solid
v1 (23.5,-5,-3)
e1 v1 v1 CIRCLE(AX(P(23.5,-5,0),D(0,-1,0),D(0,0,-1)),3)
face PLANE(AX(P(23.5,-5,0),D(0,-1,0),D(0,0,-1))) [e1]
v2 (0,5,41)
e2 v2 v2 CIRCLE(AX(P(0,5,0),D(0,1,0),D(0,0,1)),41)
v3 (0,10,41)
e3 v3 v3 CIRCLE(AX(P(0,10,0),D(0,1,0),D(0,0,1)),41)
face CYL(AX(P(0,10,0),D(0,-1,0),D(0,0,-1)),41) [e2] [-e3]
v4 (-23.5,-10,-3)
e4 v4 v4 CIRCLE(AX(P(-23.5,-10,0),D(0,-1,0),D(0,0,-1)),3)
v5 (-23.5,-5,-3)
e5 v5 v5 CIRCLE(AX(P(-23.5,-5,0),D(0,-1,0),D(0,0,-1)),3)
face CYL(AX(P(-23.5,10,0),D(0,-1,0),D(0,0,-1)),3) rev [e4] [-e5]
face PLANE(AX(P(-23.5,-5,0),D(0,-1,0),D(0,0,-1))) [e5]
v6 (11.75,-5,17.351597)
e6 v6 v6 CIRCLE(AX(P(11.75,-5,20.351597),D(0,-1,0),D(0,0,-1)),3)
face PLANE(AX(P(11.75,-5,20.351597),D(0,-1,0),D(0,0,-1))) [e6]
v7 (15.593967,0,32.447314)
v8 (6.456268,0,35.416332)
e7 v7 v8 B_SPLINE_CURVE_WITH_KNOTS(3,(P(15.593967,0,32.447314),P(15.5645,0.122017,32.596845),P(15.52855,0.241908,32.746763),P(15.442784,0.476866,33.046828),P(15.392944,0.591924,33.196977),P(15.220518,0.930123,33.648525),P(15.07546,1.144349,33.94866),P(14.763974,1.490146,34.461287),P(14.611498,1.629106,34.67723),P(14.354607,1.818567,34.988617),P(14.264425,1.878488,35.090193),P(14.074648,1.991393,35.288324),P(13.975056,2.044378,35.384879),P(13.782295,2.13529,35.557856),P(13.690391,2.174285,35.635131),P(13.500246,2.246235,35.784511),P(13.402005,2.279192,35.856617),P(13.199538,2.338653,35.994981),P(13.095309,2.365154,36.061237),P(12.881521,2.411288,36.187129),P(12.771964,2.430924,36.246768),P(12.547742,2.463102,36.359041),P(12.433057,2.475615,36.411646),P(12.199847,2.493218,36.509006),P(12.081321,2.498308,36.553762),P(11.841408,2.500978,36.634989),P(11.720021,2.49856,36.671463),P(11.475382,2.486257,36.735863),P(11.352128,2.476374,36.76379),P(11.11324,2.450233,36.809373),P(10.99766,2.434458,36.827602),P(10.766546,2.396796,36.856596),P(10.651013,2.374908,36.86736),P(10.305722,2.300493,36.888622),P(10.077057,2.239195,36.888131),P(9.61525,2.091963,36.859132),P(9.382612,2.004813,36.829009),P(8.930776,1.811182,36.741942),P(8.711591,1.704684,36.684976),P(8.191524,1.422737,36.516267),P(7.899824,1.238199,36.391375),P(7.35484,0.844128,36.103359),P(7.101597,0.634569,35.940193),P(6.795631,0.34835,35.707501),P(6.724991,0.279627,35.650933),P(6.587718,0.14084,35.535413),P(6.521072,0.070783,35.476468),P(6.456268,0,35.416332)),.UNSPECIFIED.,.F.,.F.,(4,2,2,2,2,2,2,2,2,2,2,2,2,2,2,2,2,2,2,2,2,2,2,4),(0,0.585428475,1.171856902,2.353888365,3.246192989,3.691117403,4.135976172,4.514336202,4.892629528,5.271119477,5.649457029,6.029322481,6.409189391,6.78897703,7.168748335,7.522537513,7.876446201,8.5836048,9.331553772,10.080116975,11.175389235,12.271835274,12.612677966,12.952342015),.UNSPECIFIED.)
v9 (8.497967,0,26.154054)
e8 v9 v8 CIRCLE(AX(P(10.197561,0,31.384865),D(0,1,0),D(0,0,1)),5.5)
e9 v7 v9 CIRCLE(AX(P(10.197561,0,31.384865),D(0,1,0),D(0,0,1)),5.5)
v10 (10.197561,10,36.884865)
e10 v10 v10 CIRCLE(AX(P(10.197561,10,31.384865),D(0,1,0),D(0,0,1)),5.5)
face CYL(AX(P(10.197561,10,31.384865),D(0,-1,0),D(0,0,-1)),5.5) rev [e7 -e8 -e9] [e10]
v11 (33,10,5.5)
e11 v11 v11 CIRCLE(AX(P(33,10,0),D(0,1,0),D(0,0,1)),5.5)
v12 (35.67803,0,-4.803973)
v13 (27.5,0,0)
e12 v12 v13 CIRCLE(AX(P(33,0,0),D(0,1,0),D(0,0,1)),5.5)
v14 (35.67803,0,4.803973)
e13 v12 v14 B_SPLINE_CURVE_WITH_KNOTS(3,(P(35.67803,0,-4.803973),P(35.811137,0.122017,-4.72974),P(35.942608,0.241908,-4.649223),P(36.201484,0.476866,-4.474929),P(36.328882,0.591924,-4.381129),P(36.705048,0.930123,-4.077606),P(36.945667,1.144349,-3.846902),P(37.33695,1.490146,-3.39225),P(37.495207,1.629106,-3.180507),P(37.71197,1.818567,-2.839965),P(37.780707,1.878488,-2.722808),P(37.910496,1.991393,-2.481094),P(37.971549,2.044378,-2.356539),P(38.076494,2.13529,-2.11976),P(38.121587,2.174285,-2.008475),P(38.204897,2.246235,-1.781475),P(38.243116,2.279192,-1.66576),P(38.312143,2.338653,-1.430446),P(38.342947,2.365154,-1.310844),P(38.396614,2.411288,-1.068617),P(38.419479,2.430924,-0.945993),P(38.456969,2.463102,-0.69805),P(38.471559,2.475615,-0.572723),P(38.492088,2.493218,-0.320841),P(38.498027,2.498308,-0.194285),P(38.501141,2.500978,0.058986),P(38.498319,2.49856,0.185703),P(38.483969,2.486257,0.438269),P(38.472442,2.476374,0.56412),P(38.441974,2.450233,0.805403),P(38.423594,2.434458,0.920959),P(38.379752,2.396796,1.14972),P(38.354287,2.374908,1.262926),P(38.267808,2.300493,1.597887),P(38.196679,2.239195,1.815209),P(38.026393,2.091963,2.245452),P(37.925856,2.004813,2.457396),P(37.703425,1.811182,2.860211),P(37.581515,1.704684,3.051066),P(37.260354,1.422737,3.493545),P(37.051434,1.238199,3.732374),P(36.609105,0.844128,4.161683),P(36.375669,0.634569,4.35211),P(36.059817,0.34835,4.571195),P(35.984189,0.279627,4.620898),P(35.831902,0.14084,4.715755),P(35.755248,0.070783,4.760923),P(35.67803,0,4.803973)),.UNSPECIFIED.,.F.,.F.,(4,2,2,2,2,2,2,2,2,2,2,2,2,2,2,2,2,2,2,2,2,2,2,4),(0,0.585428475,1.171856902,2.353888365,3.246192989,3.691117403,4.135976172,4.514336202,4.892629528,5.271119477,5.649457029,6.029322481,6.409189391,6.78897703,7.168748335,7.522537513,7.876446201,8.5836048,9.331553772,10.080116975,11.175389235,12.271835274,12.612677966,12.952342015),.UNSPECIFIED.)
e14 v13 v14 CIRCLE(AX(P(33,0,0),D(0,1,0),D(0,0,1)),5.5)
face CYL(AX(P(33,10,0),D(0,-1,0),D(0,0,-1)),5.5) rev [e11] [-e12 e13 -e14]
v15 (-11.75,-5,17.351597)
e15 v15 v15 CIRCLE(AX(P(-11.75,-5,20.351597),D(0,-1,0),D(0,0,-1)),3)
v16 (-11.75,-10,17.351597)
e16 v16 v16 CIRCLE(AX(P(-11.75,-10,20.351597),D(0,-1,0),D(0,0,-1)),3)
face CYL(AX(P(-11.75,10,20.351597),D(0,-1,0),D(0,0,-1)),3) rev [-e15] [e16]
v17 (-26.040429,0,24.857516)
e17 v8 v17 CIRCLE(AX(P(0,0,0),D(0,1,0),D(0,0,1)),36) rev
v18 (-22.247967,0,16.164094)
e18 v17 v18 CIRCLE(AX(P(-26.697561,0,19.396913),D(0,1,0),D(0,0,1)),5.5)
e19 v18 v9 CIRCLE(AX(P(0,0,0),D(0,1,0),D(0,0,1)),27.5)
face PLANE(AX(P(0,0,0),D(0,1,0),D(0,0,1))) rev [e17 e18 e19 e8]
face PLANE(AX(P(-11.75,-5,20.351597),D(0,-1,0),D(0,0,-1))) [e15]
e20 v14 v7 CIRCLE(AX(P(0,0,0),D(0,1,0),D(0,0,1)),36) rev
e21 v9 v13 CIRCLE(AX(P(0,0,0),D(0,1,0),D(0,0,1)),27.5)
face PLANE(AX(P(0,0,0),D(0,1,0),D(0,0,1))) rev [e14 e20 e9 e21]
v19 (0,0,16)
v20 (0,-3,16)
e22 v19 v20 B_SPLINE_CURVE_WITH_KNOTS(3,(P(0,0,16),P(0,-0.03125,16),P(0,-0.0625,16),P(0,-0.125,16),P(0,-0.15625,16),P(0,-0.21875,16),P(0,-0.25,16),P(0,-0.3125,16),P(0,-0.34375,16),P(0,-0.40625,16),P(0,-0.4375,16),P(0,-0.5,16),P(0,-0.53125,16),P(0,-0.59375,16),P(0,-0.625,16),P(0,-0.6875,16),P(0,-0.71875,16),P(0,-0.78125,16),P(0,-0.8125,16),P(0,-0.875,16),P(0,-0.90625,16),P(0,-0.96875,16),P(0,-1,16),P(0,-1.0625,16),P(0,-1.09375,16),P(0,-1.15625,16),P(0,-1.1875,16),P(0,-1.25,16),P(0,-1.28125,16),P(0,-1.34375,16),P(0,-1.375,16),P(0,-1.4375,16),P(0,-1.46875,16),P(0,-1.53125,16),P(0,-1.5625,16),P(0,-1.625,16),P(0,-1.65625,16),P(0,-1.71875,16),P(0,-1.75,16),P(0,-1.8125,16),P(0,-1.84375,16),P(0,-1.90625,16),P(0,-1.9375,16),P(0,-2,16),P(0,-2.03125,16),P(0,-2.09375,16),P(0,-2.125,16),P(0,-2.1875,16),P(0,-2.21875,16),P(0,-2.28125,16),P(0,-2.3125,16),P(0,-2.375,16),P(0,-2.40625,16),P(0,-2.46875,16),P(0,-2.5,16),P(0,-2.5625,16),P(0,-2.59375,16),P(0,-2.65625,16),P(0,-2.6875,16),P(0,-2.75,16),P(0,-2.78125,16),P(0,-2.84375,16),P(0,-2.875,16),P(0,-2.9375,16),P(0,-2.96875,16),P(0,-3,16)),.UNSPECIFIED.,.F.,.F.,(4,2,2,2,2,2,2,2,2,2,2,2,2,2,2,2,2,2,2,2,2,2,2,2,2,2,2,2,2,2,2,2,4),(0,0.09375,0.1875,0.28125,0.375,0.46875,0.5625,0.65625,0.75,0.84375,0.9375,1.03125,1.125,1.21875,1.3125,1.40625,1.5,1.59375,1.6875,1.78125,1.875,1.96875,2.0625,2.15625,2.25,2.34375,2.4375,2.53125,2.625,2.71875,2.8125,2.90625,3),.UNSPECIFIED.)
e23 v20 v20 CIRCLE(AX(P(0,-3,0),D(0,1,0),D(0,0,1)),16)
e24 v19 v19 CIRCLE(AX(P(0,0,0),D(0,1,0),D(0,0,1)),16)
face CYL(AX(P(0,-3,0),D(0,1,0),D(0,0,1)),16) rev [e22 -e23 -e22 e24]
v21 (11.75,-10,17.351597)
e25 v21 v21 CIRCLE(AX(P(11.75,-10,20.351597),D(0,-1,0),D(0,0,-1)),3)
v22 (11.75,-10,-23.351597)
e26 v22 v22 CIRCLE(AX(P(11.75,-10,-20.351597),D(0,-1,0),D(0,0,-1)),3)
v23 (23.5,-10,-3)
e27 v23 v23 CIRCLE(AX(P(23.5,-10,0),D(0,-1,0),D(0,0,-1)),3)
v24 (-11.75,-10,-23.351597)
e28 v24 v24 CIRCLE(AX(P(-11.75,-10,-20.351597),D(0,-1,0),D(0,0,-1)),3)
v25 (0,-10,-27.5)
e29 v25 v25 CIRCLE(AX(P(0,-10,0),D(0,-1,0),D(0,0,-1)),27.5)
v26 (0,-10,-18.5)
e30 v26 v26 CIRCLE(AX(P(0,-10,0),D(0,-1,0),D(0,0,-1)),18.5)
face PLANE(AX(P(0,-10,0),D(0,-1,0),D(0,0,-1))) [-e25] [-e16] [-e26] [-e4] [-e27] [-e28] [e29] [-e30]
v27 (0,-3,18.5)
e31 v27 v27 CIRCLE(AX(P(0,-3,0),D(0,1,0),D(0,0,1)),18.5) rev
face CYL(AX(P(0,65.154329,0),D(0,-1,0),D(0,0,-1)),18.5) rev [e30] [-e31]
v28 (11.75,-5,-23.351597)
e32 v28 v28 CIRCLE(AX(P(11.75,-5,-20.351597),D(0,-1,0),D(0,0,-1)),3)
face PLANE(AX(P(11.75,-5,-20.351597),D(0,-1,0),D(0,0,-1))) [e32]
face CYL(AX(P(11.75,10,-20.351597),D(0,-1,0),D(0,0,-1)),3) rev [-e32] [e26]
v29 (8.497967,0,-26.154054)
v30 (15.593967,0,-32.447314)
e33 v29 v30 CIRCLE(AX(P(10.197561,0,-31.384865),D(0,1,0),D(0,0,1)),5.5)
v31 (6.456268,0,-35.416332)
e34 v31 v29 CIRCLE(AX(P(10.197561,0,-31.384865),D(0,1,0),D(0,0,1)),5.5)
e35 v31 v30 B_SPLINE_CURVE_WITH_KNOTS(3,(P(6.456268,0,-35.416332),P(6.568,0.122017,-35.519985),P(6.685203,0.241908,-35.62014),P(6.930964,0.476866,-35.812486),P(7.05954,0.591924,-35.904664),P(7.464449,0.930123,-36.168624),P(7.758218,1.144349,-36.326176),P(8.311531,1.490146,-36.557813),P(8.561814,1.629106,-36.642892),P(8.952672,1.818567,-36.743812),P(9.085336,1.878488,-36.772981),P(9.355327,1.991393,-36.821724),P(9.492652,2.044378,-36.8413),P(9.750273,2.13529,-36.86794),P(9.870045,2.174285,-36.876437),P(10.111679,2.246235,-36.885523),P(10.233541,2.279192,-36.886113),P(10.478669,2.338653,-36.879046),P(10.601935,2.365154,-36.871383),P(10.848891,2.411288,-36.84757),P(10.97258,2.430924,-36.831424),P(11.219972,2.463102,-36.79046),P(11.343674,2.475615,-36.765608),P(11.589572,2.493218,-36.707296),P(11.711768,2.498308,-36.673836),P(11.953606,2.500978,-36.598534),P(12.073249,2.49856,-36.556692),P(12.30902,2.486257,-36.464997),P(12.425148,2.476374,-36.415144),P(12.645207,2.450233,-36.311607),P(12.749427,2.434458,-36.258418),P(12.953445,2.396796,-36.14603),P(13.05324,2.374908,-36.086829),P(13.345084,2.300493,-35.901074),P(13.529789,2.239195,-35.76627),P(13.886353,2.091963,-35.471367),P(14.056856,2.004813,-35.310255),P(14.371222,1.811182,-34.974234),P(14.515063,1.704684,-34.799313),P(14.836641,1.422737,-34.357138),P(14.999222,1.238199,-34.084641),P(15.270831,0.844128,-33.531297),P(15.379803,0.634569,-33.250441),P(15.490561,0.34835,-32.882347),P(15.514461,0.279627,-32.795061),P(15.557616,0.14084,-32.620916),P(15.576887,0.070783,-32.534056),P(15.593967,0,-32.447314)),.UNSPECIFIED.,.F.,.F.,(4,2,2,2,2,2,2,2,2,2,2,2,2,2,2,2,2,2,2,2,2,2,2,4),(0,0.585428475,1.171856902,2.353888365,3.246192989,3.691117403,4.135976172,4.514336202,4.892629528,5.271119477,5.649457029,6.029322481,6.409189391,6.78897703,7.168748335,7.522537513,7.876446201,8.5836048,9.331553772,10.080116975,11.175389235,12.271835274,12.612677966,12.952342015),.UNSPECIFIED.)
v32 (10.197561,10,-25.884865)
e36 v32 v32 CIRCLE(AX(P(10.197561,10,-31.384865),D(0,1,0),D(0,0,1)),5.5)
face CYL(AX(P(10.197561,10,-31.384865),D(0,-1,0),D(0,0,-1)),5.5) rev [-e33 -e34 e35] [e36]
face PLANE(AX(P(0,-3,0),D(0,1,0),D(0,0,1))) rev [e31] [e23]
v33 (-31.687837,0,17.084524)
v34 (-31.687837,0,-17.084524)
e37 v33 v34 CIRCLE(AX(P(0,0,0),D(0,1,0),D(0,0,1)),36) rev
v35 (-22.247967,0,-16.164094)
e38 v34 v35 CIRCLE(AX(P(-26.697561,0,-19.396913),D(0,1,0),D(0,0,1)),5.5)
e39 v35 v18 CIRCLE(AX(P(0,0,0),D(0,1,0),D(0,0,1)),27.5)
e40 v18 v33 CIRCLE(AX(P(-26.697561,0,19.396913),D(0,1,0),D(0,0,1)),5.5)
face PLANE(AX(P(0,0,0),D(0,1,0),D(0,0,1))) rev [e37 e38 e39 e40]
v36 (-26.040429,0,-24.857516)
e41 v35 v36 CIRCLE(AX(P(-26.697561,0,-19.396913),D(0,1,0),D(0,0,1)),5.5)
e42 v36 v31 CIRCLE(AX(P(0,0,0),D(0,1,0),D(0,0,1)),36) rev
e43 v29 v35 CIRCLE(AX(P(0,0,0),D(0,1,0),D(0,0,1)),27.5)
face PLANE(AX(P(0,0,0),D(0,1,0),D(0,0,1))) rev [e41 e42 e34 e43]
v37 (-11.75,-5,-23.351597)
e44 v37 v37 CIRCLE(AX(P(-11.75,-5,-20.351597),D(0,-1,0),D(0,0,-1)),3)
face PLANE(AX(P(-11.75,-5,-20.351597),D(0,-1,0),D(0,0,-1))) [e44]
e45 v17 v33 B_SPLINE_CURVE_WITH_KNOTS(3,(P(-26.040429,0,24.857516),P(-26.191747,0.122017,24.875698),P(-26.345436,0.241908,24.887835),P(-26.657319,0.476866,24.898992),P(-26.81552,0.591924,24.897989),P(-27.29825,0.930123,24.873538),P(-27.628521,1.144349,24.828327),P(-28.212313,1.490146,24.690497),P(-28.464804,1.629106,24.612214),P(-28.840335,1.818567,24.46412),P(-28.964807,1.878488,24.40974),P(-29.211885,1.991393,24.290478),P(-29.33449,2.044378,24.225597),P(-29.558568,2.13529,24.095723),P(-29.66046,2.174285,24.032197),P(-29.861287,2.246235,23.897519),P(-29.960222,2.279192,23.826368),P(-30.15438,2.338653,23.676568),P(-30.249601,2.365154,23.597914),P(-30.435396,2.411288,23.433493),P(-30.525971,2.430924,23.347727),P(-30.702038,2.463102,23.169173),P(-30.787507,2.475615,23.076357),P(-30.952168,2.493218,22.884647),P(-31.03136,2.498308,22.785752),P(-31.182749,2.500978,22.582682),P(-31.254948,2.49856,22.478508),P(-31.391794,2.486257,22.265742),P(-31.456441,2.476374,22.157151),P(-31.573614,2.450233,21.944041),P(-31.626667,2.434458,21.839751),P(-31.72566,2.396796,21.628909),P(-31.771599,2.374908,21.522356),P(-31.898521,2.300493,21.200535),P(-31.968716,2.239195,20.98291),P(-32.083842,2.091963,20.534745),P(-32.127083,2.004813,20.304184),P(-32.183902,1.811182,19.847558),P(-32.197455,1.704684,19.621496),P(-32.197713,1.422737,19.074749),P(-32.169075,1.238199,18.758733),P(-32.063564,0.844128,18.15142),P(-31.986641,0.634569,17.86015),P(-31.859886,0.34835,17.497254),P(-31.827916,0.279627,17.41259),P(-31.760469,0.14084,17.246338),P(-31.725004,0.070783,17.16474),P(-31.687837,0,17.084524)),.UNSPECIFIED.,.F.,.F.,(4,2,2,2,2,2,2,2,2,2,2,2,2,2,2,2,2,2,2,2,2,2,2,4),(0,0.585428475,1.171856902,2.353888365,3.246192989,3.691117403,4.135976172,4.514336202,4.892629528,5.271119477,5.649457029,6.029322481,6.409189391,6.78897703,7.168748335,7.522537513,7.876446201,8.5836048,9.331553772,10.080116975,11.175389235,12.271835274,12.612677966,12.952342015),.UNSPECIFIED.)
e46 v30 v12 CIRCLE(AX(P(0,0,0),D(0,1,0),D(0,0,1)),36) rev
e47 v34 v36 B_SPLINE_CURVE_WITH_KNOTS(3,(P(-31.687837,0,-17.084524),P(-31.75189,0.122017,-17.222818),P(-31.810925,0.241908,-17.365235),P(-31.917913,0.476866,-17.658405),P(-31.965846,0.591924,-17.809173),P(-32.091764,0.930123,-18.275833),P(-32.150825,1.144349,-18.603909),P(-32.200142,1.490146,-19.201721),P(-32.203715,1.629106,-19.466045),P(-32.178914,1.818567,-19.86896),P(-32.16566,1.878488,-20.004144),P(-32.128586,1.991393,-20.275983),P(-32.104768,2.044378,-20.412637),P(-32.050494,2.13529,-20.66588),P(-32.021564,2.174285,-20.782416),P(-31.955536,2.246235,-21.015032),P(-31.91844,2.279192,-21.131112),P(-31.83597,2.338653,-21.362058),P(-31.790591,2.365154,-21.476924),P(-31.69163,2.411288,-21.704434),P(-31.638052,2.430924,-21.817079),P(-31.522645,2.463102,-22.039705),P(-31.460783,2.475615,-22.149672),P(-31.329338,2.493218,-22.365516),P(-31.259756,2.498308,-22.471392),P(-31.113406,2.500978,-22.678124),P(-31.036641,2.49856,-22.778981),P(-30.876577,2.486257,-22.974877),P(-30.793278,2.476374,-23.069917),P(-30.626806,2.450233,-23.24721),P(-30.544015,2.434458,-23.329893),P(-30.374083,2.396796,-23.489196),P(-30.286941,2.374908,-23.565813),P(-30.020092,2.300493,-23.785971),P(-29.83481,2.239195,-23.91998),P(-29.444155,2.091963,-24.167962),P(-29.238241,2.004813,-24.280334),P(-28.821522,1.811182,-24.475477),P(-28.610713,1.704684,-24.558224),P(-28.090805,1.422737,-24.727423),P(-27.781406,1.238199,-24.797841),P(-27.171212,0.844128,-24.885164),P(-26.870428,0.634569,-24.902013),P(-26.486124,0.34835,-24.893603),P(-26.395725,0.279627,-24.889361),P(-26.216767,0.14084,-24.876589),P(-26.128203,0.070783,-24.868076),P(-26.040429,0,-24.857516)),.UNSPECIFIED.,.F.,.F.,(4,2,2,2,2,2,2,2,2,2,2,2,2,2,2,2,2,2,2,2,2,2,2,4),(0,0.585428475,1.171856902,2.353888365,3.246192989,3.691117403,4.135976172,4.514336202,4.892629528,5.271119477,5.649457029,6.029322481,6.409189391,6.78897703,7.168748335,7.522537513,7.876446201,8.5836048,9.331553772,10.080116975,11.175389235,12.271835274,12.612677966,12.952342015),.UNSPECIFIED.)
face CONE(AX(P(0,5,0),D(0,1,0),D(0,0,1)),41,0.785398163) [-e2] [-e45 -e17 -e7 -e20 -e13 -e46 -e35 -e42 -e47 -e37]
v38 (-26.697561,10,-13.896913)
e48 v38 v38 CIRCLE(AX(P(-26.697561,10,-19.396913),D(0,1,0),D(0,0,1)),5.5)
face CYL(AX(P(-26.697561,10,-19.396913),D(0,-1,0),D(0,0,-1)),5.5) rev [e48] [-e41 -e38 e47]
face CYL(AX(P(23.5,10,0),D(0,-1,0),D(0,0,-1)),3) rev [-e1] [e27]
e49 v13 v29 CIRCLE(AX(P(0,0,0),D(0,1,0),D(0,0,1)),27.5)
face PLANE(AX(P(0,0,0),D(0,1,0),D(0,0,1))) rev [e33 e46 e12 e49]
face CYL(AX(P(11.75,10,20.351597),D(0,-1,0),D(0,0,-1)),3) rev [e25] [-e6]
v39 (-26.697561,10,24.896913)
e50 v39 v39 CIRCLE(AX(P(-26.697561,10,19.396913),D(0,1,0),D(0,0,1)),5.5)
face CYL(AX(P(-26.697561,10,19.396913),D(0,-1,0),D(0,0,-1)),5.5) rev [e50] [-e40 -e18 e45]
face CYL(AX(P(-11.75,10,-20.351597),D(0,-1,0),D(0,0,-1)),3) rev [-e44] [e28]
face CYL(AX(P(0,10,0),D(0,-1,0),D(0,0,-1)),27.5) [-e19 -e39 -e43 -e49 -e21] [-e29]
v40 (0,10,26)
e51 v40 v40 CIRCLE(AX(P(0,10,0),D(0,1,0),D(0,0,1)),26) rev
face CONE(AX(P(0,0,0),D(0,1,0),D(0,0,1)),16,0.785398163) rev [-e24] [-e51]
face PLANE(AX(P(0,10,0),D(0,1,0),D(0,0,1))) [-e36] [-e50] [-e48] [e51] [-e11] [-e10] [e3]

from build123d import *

# Parameters (mm, degrees)
SKETCH1_R                = 41
SKETCH1_R_2              = 5.5
SKETCH1_R_3              = 25
BOSS_EXTRUDE1_DEPTH      = 10
SKETCH2_R                = 25
SKETCH2_R_2              = 22.5
BOSS_EXTRUDE2_DEPTH      = 10
BOSS_EXTRUDE4_DEPTH      = 10
BOSS_EXTRUDE4_DEPTH_BACK = 10
SKETCH4_R                = 27.5
SKETCH4_R_2              = 19.5
SKETCH4_R_3              = 3
BOSS_EXTRUDE5_START      = -10
BOSS_EXTRUDE5_DEPTH      = 10
BOSS_EXTRUDE6_START      = -10
SKETCH6_R                = 3
BOSS_EXTRUDE6_DEPTH      = 5
CHAMFER2_SIZE            = 5
BOSS_EXTRUDE7_START      = -20
SKETCH7_R                = 19.5
SKETCH7_R_2              = 18.5
BOSS_EXTRUDE7_DEPTH      = 20
SKETCH8_R                = 18.5
SKETCH8_R_2              = 16
BOSS_EXTRUDE8_DEPTH      = 13
CHAMFER4_SIZE            = 10


with BuildPart() as part:
    # Sketch1 → Boss-Extrude1 (new body)
    with BuildSketch(Plane(origin=(0, 0, 0), x_dir=(1, 0, 0), z_dir=(0, 1, 0))):
        with Locations(Location((0, 0, 0), (0, 0, 270))):
            Circle(SKETCH1_R)
        with Locations(Location((33, 0, 0), (0, 0, 270))):
            Circle(SKETCH1_R_2, mode=Mode.SUBTRACT)
        with Locations(Location((10.197560814, -31.384865038, 0), (0, 0, 270))):
            Circle(SKETCH1_R_2, mode=Mode.SUBTRACT)
        with Locations(Location((-26.697560814, -19.396913326, 0), (0, 0, 270))):
            Circle(SKETCH1_R_2, mode=Mode.SUBTRACT)
        with Locations(Location((-26.697560814, 19.396913326, 0), (0, 0, 270))):
            Circle(SKETCH1_R_2, mode=Mode.SUBTRACT)
        with Locations(Location((10.197560814, 31.384865038, 0), (0, 0, 270))):
            Circle(SKETCH1_R_2, mode=Mode.SUBTRACT)
        with Locations(Location((0, 0, 0), (0, 0, 270))):
            Circle(SKETCH1_R_3, mode=Mode.SUBTRACT)
    extrude(amount=BOSS_EXTRUDE1_DEPTH)

    # Sketch2 → Boss-Extrude2 (add)
    with BuildSketch(Plane.XZ):
        Circle(SKETCH2_R)
        with Locations(Location((0, 0, 0), (0, 0, 270))):
            Circle(SKETCH2_R_2, mode=Mode.SUBTRACT)
    extrude(amount=-BOSS_EXTRUDE2_DEPTH)

    # Sketch4 → Boss-Extrude4 (add, two sides: drawn at the far end of the back side and taken through both)
    with BuildSketch(Plane.XZ.offset(-BOSS_EXTRUDE4_DEPTH_BACK)):
        with Locations(Location((0, 0, 0), (0, 0, 270))):
            Circle(SKETCH4_R)
        with Locations(Location((0, 0, 0), (0, 0, 270))):
            Circle(SKETCH4_R_2, mode=Mode.SUBTRACT)
        with Locations(Location((23.5, 0, 0), (0, 0, 270))):
            Circle(SKETCH4_R_3, mode=Mode.SUBTRACT)
        with Locations(Location((11.75, -20.351596989, 0), (0, 0, 270))):
            Circle(SKETCH4_R_3, mode=Mode.SUBTRACT)
        with Locations(Location((-11.75, -20.351596989, 0), (0, 0, 270))):
            Circle(SKETCH4_R_3, mode=Mode.SUBTRACT)
        with Locations(Location((-23.5, 0, 0), (0, 0, 270))):
            Circle(SKETCH4_R_3, mode=Mode.SUBTRACT)
        with Locations(Location((-11.75, 20.351596989, 0), (0, 0, 270))):
            Circle(SKETCH4_R_3, mode=Mode.SUBTRACT)
        with Locations(Location((11.75, 20.351596989, 0), (0, 0, 270))):
            Circle(SKETCH4_R_3, mode=Mode.SUBTRACT)
    extrude(amount=BOSS_EXTRUDE4_DEPTH + BOSS_EXTRUDE4_DEPTH_BACK)

    # Sketch5 → Boss-Extrude5 (add)
    with BuildSketch(Plane(origin=(0, 10, 0), x_dir=(1, 0, 0), z_dir=(0, 1, 0)).offset(BOSS_EXTRUDE5_START)):
        with BuildLine():
            ThreePointArc((-13.557162741, 17.956985783), (-10.25, 17.753520778), (-8.772624493, 20.719340229))
            ThreePointArc((-8.772624493, 20.719340229), (-11.25, 19.485571585), (-13.557162741, 17.956985783))
        make_face()
        with BuildLine():
            ThreePointArc((-22.329787234, 2.762354445), (-22.5, 0), (-22.329787234, -2.762354445))
            ThreePointArc((-22.329787234, -2.762354445), (-20.5, 0), (-22.329787234, 2.762354445))
        make_face()
        with BuildLine():
            ThreePointArc((8.772624493, 20.719340229), (10.25, 17.753520778), (13.557162741, 17.956985783))
            ThreePointArc((13.557162741, 17.956985783), (11.25, 19.485571585), (8.772624493, 20.719340229))
        make_face()
        with BuildLine():
            ThreePointArc((22.329787234, 2.762354445), (20.5, 0), (22.329787234, -2.762354445))
            ThreePointArc((22.329787234, -2.762354445), (22.5, 0), (22.329787234, 2.762354445))
        make_face()
        with BuildLine():
            ThreePointArc((13.557162741, -17.956985783), (10.25, -17.753520778), (8.772624493, -20.719340229))
            ThreePointArc((8.772624493, -20.719340229), (11.25, -19.485571585), (13.557162741, -17.956985783))
        make_face()
        with BuildLine():
            ThreePointArc((-8.772624493, -20.719340229), (-10.25, -17.753520778), (-13.557162741, -17.956985783))
            ThreePointArc((-13.557162741, -17.956985783), (-11.25, -19.485571585), (-8.772624493, -20.719340229))
        make_face()
    extrude(amount=BOSS_EXTRUDE5_DEPTH)

    # Sketch6 → Boss-Extrude6 (add)
    with BuildSketch(Plane.XZ.offset(10).offset(BOSS_EXTRUDE6_START)):
        with Locations(Location((-23.5, 0, 0), (0, 0, 270))):
            Circle(SKETCH6_R)
        with Locations(Location((-11.75, 20.351596989, 0), (0, 0, 270))):
            Circle(SKETCH6_R)
        with Locations(Location((11.75, 20.351596989, 0), (0, 0, 270))):
            Circle(SKETCH6_R)
        with Locations(Location((23.5, 0, 0), (0, 0, 270))):
            Circle(SKETCH6_R)
        with Locations(Location((11.75, -20.351596989, 0), (0, 0, 270))):
            Circle(SKETCH6_R)
        with Locations(Location((-11.75, -20.351596989, 0), (0, 0, 270))):
            Circle(SKETCH6_R)
    extrude(amount=BOSS_EXTRUDE6_DEPTH)

    # Chamfer2
    # the kernel refuses this chamfer: 5 mm, written as the material it takes off along each edge
    with BuildSketch(Plane(origin=(0, 0, 0), x_dir=(0, 0, 1), z_dir=(-1, 0, 0))) as chamfer2_piece_1:
        Polygon((41, CHAMFER2_SIZE), (41 - CHAMFER2_SIZE, 0), (41, 0), align=None)
    revolve(axis=Axis((0, 0, 0), (0, 1, 0)), mode=Mode.SUBTRACT)

    # Sketch7 → Boss-Extrude7 (add)
    with BuildSketch(Plane.XZ.offset(10).offset(BOSS_EXTRUDE7_START)):
        Circle(SKETCH7_R)
        with Locations(Location((0, 0, 0), (0, 0, 270))):
            Circle(SKETCH7_R_2, mode=Mode.SUBTRACT)
    extrude(amount=BOSS_EXTRUDE7_DEPTH)

    # Sketch8 → Boss-Extrude8 (add)
    with BuildSketch(Plane(origin=(0, 10, 0), x_dir=(1, 0, 0), z_dir=(0, 1, 0))):
        with Locations(Location((0, 0, 0), (0, 0, 90))):
            Circle(SKETCH8_R)
        with Locations(Location((0, 0, 0), (0, 0, 270))):
            Circle(SKETCH8_R_2, mode=Mode.SUBTRACT)
    extrude(amount=-BOSS_EXTRUDE8_DEPTH)

    # Chamfer4
    chamfer4_edges = [part.edges().sort_by_distance(p)[0] for p in [
        (0, 10, -16),
    ]]
    chamfer(chamfer4_edges, length=CHAMFER4_SIZE)


solid = part.part
